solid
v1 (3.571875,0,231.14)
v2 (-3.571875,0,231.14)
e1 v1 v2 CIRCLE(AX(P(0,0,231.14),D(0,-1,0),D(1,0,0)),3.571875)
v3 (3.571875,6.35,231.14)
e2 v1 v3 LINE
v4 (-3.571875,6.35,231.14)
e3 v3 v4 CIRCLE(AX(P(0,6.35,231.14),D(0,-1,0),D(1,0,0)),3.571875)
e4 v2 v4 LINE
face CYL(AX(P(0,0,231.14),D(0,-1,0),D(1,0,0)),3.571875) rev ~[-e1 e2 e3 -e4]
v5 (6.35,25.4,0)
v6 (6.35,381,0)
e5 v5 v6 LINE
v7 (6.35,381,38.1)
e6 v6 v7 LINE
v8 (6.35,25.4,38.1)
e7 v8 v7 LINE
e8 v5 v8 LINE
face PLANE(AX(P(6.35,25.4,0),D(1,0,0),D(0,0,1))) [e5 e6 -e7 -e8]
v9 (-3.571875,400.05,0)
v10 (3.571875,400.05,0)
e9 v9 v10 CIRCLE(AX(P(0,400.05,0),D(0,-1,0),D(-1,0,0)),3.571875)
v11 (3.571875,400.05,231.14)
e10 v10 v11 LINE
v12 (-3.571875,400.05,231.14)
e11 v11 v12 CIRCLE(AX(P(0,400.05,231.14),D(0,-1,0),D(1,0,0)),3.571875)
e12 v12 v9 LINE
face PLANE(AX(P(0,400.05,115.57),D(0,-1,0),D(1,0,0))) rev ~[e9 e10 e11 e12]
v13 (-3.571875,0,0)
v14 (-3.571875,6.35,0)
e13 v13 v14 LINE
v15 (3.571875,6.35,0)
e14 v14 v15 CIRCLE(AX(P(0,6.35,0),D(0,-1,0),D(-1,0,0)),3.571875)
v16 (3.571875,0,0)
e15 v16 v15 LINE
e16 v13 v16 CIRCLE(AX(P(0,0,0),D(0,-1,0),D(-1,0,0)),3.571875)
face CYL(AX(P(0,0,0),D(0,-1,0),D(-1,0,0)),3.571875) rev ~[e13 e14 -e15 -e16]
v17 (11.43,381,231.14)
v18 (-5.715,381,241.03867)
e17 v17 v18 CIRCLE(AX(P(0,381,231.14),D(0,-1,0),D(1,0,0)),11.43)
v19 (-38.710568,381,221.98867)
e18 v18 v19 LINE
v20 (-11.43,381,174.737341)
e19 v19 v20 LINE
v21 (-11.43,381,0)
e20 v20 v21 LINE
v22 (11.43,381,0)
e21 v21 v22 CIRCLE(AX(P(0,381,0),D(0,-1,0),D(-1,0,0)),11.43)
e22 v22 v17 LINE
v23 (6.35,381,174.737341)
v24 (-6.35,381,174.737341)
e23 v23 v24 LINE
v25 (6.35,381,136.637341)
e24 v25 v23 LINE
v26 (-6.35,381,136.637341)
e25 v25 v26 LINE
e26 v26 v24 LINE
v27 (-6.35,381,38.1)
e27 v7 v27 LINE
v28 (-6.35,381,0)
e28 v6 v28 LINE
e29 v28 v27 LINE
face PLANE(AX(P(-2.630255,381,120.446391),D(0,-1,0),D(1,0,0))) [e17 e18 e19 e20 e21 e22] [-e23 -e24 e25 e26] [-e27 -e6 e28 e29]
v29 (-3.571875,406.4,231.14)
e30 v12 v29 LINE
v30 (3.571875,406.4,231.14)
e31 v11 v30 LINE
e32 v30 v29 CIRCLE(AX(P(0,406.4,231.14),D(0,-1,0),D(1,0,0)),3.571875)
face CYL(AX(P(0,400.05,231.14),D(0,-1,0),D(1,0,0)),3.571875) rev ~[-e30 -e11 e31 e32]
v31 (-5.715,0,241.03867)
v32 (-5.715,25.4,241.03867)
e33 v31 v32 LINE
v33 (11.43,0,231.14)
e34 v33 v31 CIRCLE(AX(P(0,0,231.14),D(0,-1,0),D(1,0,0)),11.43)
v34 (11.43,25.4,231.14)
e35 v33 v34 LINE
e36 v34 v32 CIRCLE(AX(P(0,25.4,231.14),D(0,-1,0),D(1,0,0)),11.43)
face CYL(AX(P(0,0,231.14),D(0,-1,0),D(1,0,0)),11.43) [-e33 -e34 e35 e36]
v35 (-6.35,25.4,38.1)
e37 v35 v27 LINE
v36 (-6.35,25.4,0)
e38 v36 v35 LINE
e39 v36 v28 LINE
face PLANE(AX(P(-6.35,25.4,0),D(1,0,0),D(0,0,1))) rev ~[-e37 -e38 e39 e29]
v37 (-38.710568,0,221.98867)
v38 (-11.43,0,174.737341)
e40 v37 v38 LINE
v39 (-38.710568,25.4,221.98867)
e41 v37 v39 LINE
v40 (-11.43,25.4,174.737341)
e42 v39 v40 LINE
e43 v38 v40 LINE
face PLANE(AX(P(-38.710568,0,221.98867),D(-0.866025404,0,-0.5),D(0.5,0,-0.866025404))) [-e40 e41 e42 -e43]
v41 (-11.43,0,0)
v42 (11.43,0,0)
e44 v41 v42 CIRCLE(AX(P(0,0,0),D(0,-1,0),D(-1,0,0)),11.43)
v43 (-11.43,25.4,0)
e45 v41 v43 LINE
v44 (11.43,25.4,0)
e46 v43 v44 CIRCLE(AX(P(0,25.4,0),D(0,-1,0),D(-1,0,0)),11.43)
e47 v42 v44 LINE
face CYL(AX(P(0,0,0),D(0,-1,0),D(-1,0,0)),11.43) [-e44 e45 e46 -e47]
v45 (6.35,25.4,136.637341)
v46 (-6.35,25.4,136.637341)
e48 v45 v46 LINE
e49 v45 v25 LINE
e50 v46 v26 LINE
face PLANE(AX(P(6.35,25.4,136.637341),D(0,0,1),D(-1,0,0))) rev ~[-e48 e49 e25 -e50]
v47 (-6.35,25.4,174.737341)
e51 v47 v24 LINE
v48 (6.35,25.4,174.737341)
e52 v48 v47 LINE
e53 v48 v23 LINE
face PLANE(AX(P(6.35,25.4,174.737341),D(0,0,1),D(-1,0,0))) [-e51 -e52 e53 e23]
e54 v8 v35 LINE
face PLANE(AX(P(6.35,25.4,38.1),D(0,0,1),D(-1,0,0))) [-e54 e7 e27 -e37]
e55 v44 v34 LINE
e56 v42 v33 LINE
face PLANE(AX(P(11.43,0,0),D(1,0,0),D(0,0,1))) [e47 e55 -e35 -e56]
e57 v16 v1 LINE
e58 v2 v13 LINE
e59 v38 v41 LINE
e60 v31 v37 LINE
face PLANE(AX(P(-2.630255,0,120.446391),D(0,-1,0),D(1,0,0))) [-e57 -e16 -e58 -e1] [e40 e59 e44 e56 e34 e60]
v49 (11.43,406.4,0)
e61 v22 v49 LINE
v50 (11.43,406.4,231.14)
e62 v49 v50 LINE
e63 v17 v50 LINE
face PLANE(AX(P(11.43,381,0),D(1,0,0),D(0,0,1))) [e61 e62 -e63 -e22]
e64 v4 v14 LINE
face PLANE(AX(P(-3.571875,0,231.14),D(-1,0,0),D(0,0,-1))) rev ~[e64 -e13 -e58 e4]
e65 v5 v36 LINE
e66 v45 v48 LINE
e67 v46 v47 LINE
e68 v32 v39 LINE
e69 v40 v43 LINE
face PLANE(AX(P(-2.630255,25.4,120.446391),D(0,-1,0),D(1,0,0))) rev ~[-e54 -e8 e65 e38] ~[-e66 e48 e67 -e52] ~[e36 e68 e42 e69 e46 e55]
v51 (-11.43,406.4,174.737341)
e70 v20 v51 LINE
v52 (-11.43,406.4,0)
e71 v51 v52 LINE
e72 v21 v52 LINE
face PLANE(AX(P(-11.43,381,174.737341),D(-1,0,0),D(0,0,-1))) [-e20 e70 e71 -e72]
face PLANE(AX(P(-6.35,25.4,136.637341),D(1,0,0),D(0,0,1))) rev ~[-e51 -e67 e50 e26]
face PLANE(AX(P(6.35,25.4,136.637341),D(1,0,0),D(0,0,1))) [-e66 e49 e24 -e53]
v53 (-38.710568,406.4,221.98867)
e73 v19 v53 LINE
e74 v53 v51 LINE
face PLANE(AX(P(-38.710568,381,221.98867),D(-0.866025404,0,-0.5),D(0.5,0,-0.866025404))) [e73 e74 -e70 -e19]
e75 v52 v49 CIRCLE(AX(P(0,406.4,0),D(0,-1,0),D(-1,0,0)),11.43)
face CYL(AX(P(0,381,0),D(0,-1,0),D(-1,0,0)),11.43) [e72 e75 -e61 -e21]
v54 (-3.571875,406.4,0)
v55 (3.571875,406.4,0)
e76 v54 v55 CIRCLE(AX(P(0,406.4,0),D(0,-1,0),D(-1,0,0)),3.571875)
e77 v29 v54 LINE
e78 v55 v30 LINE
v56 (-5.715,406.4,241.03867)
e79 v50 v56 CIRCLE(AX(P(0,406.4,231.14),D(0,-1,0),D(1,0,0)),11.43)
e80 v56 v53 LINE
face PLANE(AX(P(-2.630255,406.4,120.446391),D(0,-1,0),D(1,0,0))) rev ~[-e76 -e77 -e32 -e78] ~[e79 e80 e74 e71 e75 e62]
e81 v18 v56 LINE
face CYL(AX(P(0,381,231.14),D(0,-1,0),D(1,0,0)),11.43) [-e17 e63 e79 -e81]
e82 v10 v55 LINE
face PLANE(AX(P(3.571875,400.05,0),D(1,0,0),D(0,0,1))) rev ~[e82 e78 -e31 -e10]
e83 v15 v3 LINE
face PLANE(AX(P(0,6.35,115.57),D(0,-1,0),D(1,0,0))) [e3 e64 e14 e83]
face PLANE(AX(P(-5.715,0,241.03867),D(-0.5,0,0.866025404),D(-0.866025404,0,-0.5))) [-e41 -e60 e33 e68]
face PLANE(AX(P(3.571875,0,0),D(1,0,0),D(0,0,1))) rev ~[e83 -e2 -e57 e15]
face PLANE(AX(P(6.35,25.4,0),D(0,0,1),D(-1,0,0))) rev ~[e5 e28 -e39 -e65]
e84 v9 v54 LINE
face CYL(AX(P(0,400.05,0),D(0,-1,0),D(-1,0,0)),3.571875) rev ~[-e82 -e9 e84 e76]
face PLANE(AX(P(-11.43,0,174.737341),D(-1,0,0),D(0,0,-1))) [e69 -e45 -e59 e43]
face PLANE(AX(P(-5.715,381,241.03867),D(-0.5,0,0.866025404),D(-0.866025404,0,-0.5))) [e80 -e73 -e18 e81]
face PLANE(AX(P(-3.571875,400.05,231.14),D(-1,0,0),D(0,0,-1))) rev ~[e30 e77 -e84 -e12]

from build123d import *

# Parameters (mm, degrees)
F1_DEPTH      = 25.4
F2_START      = -381
F2_DEPTH      = 25.4
F3_W          = 12.7
F3_H          = 38.1
F4_DEPTH      = 361.95
F4_DEPTH_BACK = 6.35
F6_DEPTH      = 6.35
F7_START      = -400.05
F7_DEPTH      = 6.35


# Not quite as in the source:
# - a feature of the source that left no trace in its solid (it failed there, or was rolled back) is left out


with BuildPart() as f1:
    # F0 (on Front) → F1 (new body)
    with BuildSketch(Plane.XZ):
        with BuildLine():
            Line((-11.43, 174.7373407305), (-11.43, 0))
            ThreePointArc((-11.43, 0), (0, -11.43), (11.43, 0))
            Line((11.43, 0), (11.43, 231.14))
            ThreePointArc((11.43, 231.14), (5.715, 241.0386703653), (-5.715, 241.0386703653))
            Line((-5.715, 241.0386703653), (-38.7105678842, 221.9886703653))
            Line((-38.7105678842, 221.9886703653), (-11.43, 174.7373407305))
        make_face()
        with BuildLine():
            Line((-3.571875, 0), (-3.571875, 231.14))
            ThreePointArc((-3.571875, 231.14), (0, 234.711875), (3.571875, 231.14))
            Line((3.571875, 231.14), (3.571875, 0))
            ThreePointArc((3.571875, 0), (0, -3.571875), (-3.571875, 0))
        make_face(mode=Mode.SUBTRACT)
        with BuildLine():
            ThreePointArc((3.571875, 231.14), (0, 234.711875), (-3.571875, 231.14))
            Line((-3.571875, 231.14), (-3.571875, 0))
            ThreePointArc((-3.571875, 0), (0, -3.571875), (3.571875, 0))
            Line((3.571875, 0), (3.571875, 231.14))
        make_face()
    extrude(amount=-F1_DEPTH)



with BuildPart() as f2:
    # F0 (on Front) → F2 (new body)
    with BuildSketch(Plane.XZ.offset(F2_START)):
        with BuildLine():
            Line((-11.43, 174.7373407305), (-11.43, 0))
            ThreePointArc((-11.43, 0), (0, -11.43), (11.43, 0))
            Line((11.43, 0), (11.43, 231.14))
            ThreePointArc((11.43, 231.14), (5.715, 241.0386703653), (-5.715, 241.0386703653))
            Line((-5.715, 241.0386703653), (-38.7105678842, 221.9886703653))
            Line((-38.7105678842, 221.9886703653), (-11.43, 174.7373407305))
        make_face()
        with BuildLine():
            Line((-3.571875, 0), (-3.571875, 231.14))
            ThreePointArc((-3.571875, 231.14), (0, 234.711875), (3.571875, 231.14))
            Line((3.571875, 231.14), (3.571875, 0))
            ThreePointArc((3.571875, 0), (0, -3.571875), (-3.571875, 0))
        make_face(mode=Mode.SUBTRACT)
        with BuildLine():
            ThreePointArc((3.571875, 231.14), (0, 234.711875), (-3.571875, 231.14))
            Line((-3.571875, 231.14), (-3.571875, 0))
            ThreePointArc((-3.571875, 0), (0, -3.571875), (3.571875, 0))
            Line((3.571875, 0), (3.571875, 231.14))
        make_face()
    extrude(amount=-F2_DEPTH)


with BuildPart() as f1_1:
    add(f1.part)

    add(f2.part)  # F4 merges F2
    # F3 (on face) → F4 (join, two sides)
    with BuildSketch(Plane(origin=(0, 25.4, 0), x_dir=(-1, 0, 0), z_dir=(0, 1, 0))) as f4_sk:
        with Locations((0, 155.6873407305)):
            Rectangle(F3_W, F3_H)
        with Locations((0, 19.05)):
            Rectangle(F3_W, F3_H)
    extrude(amount=F4_DEPTH)
    extrude(f4_sk.sketch, amount=-F4_DEPTH_BACK)

    # F0 (on Front) → F6 (cut)
    with BuildSketch(Plane.XZ):
        with BuildLine():
            ThreePointArc((3.571875, 231.14), (0, 234.711875), (-3.571875, 231.14))
            Line((-3.571875, 231.14), (-3.571875, 0))
            ThreePointArc((-3.571875, 0), (0, -3.571875), (3.571875, 0))
            Line((3.571875, 0), (3.571875, 231.14))
        make_face()
    extrude(amount=-F6_DEPTH, mode=Mode.SUBTRACT)

    # F0 (on Front) → F7 (cut)
    with BuildSketch(Plane.XZ.offset(F7_START)):
        with BuildLine():
            ThreePointArc((3.571875, 231.14), (0, 234.711875), (-3.571875, 231.14))
            Line((-3.571875, 231.14), (-3.571875, 0))
            ThreePointArc((-3.571875, 0), (0, -3.571875), (3.571875, 0))
            Line((3.571875, 0), (3.571875, 231.14))
        make_face()
    extrude(amount=-F7_DEPTH, mode=Mode.SUBTRACT)


solid = f1_1.part
